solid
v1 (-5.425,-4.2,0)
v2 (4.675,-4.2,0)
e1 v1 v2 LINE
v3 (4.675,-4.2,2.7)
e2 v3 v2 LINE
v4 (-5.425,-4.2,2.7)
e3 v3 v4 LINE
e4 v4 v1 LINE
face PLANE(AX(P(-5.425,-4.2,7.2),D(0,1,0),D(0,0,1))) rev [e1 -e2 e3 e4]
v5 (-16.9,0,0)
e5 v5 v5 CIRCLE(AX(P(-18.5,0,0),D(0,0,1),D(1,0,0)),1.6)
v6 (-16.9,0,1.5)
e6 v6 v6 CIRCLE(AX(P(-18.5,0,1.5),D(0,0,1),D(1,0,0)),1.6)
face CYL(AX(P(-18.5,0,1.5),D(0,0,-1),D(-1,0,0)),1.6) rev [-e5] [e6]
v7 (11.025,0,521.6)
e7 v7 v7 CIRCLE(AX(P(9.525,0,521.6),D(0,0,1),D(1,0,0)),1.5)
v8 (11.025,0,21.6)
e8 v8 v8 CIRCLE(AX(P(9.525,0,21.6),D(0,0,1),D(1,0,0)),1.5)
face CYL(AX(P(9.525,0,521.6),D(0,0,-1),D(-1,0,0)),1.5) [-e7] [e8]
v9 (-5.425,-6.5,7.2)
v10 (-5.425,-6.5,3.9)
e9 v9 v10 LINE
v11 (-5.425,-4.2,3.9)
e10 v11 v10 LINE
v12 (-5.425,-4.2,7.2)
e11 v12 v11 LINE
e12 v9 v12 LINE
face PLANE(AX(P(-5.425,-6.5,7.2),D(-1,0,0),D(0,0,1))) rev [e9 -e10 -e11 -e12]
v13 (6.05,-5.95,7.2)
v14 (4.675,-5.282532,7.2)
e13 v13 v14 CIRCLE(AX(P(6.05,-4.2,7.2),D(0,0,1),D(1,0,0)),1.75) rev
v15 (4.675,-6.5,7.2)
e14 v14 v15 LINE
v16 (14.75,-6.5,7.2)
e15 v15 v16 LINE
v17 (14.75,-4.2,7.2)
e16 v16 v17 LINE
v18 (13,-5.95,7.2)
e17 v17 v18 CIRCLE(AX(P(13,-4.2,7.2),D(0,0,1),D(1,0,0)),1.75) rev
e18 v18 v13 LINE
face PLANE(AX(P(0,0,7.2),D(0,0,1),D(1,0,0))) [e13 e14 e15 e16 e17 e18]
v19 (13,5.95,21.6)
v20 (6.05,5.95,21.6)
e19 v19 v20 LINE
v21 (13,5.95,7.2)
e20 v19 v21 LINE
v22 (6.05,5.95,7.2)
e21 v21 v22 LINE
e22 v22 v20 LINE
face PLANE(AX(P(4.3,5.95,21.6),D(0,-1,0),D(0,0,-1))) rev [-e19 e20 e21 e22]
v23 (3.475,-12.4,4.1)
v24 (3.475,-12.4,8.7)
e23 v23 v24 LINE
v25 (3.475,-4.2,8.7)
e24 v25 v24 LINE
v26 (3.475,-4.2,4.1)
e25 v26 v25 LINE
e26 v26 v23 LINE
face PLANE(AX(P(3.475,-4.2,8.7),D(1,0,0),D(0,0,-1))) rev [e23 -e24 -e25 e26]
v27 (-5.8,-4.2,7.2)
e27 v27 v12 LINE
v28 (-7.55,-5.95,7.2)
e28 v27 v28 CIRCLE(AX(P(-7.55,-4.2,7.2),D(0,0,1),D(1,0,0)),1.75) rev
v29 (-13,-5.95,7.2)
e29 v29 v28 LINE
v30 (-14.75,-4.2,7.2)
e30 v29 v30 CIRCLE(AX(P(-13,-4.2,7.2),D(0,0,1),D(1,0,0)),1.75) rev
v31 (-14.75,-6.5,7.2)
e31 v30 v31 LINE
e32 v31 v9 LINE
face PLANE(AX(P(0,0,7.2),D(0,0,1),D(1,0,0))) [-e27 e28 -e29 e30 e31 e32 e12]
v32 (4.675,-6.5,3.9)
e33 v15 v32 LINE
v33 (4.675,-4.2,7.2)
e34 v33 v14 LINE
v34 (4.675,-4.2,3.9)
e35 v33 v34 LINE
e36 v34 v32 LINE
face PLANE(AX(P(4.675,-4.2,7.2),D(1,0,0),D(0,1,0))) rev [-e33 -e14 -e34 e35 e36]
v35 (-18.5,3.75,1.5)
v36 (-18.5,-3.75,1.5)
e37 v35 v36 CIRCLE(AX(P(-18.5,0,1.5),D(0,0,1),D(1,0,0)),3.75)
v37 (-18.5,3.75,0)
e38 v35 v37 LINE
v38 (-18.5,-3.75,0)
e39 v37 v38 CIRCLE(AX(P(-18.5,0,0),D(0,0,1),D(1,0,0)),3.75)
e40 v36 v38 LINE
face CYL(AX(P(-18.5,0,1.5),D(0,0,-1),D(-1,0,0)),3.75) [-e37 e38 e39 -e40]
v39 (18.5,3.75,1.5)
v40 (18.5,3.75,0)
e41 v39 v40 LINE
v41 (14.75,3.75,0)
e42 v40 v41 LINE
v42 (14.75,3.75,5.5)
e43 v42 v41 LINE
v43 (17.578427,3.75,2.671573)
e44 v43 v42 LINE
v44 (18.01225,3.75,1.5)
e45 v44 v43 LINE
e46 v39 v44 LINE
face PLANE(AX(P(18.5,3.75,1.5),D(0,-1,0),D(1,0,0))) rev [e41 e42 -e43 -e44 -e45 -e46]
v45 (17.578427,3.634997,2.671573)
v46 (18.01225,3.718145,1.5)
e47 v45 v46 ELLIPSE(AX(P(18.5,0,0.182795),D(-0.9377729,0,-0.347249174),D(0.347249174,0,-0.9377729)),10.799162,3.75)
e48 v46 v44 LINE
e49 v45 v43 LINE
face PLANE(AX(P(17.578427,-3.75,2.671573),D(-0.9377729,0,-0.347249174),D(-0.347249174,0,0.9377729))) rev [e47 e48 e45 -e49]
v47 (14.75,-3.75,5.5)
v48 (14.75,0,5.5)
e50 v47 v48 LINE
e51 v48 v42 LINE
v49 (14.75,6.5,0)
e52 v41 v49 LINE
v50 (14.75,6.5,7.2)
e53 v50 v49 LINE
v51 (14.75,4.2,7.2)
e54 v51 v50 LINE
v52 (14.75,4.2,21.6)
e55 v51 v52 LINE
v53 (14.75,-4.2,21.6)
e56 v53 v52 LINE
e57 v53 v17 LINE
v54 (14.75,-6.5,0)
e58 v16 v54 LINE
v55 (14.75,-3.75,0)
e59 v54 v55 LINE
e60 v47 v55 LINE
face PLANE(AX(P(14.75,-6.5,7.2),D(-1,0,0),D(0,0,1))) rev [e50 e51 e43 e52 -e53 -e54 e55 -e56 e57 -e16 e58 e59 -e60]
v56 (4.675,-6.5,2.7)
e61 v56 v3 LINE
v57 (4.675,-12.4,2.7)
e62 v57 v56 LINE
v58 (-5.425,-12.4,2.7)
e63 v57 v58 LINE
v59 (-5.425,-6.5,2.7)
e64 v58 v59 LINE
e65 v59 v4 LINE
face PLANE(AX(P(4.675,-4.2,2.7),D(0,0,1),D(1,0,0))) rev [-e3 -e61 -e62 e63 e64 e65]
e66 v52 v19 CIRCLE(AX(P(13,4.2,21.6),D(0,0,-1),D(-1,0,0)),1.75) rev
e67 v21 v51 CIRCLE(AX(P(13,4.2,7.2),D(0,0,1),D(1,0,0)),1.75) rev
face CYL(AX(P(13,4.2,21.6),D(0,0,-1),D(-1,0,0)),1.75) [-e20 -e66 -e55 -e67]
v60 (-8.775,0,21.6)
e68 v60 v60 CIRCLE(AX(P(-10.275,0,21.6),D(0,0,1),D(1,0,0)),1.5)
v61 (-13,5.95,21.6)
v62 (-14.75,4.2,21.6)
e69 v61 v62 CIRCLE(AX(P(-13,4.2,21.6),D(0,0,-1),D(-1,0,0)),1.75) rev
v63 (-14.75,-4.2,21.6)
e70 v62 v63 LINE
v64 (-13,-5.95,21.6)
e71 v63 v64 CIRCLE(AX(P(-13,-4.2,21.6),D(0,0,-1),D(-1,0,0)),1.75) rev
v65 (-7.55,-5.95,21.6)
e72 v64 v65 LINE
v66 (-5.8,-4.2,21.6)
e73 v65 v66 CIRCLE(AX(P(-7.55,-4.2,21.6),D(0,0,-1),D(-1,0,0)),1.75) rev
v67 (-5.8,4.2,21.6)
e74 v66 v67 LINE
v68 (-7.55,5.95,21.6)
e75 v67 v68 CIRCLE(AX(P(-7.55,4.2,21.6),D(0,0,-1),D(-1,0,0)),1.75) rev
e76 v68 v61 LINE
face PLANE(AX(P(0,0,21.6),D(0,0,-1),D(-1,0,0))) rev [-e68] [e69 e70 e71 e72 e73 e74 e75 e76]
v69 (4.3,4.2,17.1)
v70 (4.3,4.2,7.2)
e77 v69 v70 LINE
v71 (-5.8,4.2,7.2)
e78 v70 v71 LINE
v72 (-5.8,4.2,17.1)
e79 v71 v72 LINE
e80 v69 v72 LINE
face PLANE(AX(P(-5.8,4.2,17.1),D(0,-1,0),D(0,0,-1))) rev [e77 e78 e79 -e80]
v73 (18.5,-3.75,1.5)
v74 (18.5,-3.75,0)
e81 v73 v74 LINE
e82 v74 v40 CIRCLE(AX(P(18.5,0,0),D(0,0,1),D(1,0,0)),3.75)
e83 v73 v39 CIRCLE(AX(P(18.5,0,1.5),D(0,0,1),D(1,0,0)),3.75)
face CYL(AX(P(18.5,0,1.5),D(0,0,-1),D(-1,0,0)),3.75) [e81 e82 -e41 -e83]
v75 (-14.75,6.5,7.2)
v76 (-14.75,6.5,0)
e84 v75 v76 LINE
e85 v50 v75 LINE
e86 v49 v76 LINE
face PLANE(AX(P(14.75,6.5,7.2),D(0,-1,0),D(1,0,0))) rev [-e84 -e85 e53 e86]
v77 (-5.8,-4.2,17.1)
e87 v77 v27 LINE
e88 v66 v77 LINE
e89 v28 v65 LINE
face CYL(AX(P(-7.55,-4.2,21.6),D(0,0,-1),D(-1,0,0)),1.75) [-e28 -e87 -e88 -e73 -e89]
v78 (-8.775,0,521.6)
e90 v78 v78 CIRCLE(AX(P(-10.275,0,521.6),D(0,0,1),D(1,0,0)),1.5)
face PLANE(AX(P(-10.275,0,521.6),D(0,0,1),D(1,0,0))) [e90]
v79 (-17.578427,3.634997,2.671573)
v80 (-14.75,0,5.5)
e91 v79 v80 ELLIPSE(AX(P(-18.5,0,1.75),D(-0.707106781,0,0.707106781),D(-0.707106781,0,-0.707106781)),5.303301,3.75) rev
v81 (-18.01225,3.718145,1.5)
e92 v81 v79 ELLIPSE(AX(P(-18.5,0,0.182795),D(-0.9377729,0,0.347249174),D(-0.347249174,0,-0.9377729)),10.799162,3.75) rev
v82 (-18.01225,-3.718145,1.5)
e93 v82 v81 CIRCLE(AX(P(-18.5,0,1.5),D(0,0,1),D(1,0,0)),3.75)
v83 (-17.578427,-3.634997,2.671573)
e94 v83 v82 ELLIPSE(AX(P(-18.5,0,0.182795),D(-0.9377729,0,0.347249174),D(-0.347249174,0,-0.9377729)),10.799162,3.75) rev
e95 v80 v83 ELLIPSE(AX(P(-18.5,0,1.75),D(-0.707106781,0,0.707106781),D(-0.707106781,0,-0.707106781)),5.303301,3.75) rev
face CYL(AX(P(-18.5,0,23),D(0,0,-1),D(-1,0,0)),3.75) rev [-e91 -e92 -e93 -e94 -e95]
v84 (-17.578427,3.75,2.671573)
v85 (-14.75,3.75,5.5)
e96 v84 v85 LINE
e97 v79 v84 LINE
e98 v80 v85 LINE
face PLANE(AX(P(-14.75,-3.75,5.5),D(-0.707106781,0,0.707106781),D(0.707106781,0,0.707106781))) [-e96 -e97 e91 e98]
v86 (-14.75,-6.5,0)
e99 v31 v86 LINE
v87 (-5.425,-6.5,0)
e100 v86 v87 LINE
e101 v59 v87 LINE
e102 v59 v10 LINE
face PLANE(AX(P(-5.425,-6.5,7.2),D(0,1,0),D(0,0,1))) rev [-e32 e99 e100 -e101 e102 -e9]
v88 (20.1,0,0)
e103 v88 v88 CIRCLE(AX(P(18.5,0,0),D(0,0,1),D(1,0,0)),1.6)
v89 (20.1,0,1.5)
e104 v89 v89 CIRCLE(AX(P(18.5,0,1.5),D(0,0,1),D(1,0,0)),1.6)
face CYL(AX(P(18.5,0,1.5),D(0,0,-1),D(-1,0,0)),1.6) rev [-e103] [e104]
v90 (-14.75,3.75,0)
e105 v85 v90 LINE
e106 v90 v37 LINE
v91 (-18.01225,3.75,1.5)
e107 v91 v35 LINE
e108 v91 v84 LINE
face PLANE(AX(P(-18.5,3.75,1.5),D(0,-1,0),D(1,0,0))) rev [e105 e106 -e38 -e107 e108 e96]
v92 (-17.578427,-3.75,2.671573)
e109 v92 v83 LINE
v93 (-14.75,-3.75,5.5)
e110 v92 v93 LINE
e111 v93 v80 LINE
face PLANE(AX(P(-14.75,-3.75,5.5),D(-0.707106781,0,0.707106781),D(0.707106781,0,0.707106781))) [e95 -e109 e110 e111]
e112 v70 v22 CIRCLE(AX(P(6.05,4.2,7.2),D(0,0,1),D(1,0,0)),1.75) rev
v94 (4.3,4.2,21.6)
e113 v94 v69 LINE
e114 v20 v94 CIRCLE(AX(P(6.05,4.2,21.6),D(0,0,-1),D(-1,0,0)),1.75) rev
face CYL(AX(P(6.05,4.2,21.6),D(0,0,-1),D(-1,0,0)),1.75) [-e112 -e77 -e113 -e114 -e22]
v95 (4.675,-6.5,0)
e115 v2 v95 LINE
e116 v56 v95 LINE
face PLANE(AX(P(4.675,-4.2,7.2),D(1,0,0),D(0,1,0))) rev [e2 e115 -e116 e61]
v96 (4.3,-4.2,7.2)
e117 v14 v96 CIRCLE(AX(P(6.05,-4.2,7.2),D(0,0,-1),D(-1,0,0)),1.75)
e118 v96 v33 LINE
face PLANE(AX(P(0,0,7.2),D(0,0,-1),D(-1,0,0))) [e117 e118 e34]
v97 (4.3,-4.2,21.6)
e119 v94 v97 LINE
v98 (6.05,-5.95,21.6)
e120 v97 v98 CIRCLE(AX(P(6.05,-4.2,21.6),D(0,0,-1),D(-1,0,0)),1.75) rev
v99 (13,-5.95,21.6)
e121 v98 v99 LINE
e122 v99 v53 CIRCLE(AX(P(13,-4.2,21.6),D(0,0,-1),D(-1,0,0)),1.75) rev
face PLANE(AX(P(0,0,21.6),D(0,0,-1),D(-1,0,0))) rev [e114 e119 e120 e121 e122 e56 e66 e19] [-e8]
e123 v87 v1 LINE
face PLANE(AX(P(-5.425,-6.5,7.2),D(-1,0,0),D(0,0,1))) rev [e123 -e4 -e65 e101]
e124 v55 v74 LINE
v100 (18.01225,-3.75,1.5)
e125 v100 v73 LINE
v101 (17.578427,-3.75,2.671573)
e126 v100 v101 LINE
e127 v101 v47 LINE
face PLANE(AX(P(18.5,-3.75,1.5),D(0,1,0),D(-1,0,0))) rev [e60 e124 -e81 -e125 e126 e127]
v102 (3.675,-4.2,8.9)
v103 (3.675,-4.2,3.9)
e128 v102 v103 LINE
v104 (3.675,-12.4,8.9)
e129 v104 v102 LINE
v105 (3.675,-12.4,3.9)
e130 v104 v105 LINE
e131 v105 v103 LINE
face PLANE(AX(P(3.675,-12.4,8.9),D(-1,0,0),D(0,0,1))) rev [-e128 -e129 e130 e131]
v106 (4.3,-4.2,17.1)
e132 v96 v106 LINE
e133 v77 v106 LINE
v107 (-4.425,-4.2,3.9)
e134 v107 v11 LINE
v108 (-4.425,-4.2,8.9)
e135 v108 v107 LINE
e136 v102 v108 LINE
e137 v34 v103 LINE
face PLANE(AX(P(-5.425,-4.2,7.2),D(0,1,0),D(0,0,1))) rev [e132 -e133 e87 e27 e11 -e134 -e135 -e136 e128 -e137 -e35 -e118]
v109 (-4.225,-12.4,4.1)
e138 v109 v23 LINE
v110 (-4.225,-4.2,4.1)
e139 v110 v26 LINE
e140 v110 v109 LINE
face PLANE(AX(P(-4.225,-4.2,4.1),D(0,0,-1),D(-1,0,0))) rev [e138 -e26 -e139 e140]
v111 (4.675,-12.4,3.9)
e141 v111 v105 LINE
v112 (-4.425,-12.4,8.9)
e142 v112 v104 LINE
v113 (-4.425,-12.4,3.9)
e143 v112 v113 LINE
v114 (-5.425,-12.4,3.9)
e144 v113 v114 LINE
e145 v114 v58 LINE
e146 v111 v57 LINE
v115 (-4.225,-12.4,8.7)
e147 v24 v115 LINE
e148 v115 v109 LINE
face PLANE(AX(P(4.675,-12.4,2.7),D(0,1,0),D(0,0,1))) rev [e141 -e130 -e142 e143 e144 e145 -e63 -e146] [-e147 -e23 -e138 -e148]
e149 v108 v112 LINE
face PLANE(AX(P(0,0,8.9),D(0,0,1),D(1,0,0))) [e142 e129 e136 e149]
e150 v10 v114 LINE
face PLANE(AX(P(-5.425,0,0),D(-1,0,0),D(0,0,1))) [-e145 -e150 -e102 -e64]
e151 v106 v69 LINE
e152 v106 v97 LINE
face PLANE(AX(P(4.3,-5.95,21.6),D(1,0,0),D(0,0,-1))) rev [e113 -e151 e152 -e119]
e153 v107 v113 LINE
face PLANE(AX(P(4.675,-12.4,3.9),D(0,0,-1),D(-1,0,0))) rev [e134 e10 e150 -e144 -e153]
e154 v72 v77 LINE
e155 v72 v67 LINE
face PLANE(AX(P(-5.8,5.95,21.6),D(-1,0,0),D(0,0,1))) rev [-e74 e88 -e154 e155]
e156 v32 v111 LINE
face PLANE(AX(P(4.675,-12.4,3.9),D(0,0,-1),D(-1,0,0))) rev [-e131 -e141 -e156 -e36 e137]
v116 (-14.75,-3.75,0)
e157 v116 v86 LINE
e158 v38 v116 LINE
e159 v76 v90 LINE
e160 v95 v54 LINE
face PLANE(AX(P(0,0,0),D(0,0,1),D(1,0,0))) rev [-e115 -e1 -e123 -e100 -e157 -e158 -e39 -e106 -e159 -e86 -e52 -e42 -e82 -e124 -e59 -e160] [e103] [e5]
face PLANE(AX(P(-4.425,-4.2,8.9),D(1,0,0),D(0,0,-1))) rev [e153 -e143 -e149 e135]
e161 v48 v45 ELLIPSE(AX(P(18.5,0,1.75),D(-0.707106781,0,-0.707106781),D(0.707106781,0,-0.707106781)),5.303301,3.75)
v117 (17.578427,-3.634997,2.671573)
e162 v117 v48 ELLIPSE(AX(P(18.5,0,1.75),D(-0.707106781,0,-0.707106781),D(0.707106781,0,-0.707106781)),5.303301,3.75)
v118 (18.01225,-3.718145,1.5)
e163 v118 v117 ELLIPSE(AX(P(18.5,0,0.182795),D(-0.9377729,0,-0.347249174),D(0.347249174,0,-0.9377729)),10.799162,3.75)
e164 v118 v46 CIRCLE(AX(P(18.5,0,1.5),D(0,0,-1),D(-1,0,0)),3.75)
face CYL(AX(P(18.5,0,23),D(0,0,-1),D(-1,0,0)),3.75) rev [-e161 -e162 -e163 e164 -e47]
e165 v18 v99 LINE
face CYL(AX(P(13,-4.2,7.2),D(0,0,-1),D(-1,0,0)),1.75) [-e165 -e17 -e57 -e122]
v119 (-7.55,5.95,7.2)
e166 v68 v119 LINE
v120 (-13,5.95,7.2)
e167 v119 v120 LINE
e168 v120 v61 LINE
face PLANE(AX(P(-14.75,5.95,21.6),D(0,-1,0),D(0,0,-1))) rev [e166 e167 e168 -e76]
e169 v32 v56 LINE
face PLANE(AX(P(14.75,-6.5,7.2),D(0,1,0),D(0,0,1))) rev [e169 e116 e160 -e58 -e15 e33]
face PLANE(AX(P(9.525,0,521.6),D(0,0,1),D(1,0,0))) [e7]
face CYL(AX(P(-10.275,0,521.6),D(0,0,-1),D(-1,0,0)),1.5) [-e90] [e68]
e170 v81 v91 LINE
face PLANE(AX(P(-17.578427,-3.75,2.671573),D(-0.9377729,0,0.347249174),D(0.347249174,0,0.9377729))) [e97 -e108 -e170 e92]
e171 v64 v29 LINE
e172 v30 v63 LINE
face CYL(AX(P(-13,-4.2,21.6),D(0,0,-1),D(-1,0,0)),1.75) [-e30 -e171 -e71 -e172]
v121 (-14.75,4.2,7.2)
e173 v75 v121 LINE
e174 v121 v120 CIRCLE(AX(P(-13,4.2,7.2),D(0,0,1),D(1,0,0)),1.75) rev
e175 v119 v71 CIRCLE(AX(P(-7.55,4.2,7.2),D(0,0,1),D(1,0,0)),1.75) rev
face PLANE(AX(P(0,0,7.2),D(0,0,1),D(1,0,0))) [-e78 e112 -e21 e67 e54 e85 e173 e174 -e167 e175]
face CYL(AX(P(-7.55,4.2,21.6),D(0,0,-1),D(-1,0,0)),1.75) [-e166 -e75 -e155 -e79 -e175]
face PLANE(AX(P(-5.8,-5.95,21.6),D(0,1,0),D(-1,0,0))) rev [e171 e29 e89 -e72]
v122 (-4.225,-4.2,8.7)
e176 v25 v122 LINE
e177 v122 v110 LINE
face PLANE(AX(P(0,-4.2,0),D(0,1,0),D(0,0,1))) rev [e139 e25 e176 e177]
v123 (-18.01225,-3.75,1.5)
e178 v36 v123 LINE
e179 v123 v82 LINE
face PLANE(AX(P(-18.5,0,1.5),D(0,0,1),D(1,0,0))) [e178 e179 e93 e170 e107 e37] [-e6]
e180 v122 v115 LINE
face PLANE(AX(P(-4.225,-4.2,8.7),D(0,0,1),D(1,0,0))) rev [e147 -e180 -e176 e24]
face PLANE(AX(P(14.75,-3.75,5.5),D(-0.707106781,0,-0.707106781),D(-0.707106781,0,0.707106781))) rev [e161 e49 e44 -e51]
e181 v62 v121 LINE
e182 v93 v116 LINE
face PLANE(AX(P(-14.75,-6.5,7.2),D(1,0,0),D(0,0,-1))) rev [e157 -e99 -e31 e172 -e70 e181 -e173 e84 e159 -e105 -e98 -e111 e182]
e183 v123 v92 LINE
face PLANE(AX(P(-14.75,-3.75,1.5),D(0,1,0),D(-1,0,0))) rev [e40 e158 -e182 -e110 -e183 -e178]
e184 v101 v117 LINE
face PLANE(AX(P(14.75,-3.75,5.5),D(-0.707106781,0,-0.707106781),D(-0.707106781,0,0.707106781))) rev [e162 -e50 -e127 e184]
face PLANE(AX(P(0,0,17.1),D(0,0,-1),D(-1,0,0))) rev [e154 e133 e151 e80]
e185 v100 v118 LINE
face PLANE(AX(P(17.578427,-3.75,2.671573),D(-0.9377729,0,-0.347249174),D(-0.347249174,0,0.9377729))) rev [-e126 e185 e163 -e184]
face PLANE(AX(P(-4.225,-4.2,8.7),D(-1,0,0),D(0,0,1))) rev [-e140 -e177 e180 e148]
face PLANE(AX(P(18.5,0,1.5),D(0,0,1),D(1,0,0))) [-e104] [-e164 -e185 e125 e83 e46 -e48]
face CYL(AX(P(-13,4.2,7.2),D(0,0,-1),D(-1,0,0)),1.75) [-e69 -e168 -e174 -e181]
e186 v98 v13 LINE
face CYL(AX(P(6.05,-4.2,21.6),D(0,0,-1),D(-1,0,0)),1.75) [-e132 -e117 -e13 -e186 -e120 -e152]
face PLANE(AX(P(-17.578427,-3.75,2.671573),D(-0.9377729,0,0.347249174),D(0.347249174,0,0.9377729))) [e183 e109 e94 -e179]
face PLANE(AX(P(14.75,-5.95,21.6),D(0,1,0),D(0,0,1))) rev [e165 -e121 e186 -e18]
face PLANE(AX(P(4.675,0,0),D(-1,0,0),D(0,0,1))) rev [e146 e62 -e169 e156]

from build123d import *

# Parameters (mm, degrees)
EXTRUDE_1_DEPTH     = 7.2
SKETCH_2_R          = 1.6
EXTRUDE_2_DEPTH     = 1.5
EXTRUDE_START       = -7.5
EXTRUDE_3_DEPTH     = 7.5
EXTRUDE_4_DEPTH     = 10.1
SKETCH_7_R          = 3.75
CUT_EXTRUDE_3_DEPTH = 21.5
SKETCH_8_W          = 10.45
SKETCH_8_H          = 11.9
EXTRUDE_5_DEPTH     = 14.4
FILLET_1_R          = 1.75
EXTRUDE_6_DEPTH     = 9.9
SKETCH_10_W         = 8.1
SKETCH_10_H         = 8.2
EXTRUDE_7_DEPTH     = 5
SKETCH_11_W         = 7.7
SKETCH_11_H         = 4.6
CUT_EXTRUDE_4_DEPTH = 8.2
SKETCH_13_R         = 1.5
EXTRUDE_9_DEPTH     = 500


with BuildPart() as part:
    # 草图1 → 凸台-拉伸1 (new body)
    with BuildSketch(Plane.XY):
        Polygon((14.75, -6.5), (4.675, -6.5), (4.675, -4.2), (-5.425, -4.2), (-5.425, -6.5), (-14.75, -6.5), (-14.75, 6.5), (14.75, 6.5), align=None)
    extrude(amount=EXTRUDE_1_DEPTH)

    # 草图2 → 凸台-拉伸2 (add)
    # profile 1 of 2: a face of its own
    with BuildSketch(Plane.XY):
        with BuildLine():
            Line((-18.5, 3.75), (-14.75, 3.75))
            Line((-14.75, 3.75), (-14.75, -3.75))
            Line((-14.75, -3.75), (-18.5, -3.75))
            ThreePointArc((-18.5, -3.75), (-22.25, 0), (-18.5, 3.75))
        make_face()
        with Locations((-18.5, 0)):
            Circle(SKETCH_2_R, mode=Mode.SUBTRACT)
    # profile 2 of 2: a face of its own
    with BuildSketch(Plane.XY):
        with BuildLine():
            Line((18.5, 3.75), (14.75, 3.75))
            Line((14.75, 3.75), (14.75, 0))
            Line((14.75, 0), (14.75, -3.75))
            Line((14.75, -3.75), (18.5, -3.75))
            ThreePointArc((18.5, -3.75), (22.25, 0), (18.5, 3.75))
        make_face()
        with Locations((18.5, 0)):
            Circle(SKETCH_2_R, mode=Mode.SUBTRACT)
    extrude(amount=EXTRUDE_2_DEPTH)

    # 草图3 → 凸台-拉伸3 (add)
    with BuildSketch(Plane(origin=(0, 3.75, 0), x_dir=(1, 0, 0), z_dir=(0, 1, 0)).offset(EXTRUDE_START)):
        Polygon((-14.75, -1.5), (-14.75, -5.5), (-17.578427125, -2.671572875), (-18.012250402, -1.5), align=None)
    extrude_3 = extrude(amount=EXTRUDE_3_DEPTH)

    # 草图5 → 凸台-拉伸4 (add)
    with BuildSketch(Plane(origin=(-5.425, 0, 0), x_dir=(0, 0, -1), z_dir=(1, 0, 0))):
        Polygon((-3.9, -4.2), (-2.7, -4.2), (-2.7, -6.5), (-2.7, -12.4), (-3.9, -12.4), align=None)
    extrude(amount=EXTRUDE_4_DEPTH)

    # 草图7 → 切除-拉伸3 (cut)
    with BuildSketch(Plane.XY.offset(1.5)):
        with Locations((-18.5, 0)):
            Circle(SKETCH_7_R)
        with BuildLine():
            Line((-18.012250402, 1.523843932), (-18.012250402, -1.523843932))
            ThreePointArc((-18.012250402, -1.523843932), (-20.1, 0), (-18.012250402, 1.523843932))
        make_face(mode=Mode.SUBTRACT)
    cut_extrude_3 = extrude(amount=CUT_EXTRUDE_3_DEPTH, mode=Mode.SUBTRACT)

    # 镜向2: 凸台-拉伸3, 切除-拉伸3 across plane
    add(extrude_3.mirror(Plane(origin=(0, 0, 0), x_dir=(0, 0, 1), z_dir=(1, 0, 0))))
    add(cut_extrude_3.mirror(Plane(origin=(0, 0, 0), x_dir=(0, 0, 1), z_dir=(1, 0, 0))), mode=Mode.SUBTRACT)

    # 草图8 → 凸台-拉伸5 (add)
    with BuildSketch(Plane.XY.offset(7.2)):
        Polygon((-14.75, 0), (-14.75, 5.95), (-5.8, 5.95), (-5.8, -5.95), (-14.75, -5.95), align=None)
        with Locations((9.525, 0)):
            Rectangle(SKETCH_8_W, SKETCH_8_H)
    extrude(amount=EXTRUDE_5_DEPTH)

    # 圆角1
    # the kernel refuses this fillet: 1.75 mm, written as the material it takes off along each edge
    with BuildSketch(Plane(origin=(-14.75, -5.95, 7.2), x_dir=(0, 1, 0), z_dir=(0, 0, 1)), Plane(origin=(14.75, 5.95, 7.2), x_dir=(0, -1, 0), z_dir=(0, 0, 1))) as fillet_1_piece_1:
        with BuildLine():
            CenterArc((FILLET_1_R, -FILLET_1_R), FILLET_1_R, 90, 90)
            Line((0, -FILLET_1_R), (0, 0))
            Line((0, 0), (FILLET_1_R, 0))
        make_face()
    extrude(amount=18.775, mode=Mode.SUBTRACT)
    with BuildSketch(Plane(origin=(-5.8, -5.95, 7.2), x_dir=(0, 1, 0), z_dir=(0, 0, 1)), Plane(origin=(-5.8, 5.95, 7.2), x_dir=(-1, 0, 0), z_dir=(0, 0, 1)), Plane(origin=(-14.75, 5.95, 7.2), x_dir=(0, -1, 0), z_dir=(0, 0, 1)), Plane(origin=(14.75, -5.95, 7.2), x_dir=(0, 1, 0), z_dir=(0, 0, 1)), Plane(origin=(4.3, 5.95, 7.2), x_dir=(0, -1, 0), z_dir=(0, 0, 1)), Plane(origin=(4.3, -5.95, 7.2), x_dir=(1, 0, 0), z_dir=(0, 0, 1))) as fillet_1_piece_2:
        with BuildLine():
            CenterArc((FILLET_1_R, FILLET_1_R), FILLET_1_R, 180, 90)
            Line((0, FILLET_1_R), (0, 0))
            Line((0, 0), (FILLET_1_R, 0))
        make_face()
    extrude(amount=18.775, mode=Mode.SUBTRACT)

    # 草图9 → 凸台-拉伸6 (add)
    with BuildSketch(Plane.XY.offset(7.2)):
        Polygon((-5.8, 0), (-5.8, 4.2), (4.3, 4.2), (4.3, -4.2), (-5.8, -4.2), align=None)
    extrude(amount=EXTRUDE_6_DEPTH)

    # 草图10 → 凸台-拉伸7 (add)
    with BuildSketch(Plane.XY.offset(3.9)):
        with Locations((-0.375, -8.3)):
            Rectangle(SKETCH_10_W, SKETCH_10_H)
    extrude(amount=EXTRUDE_7_DEPTH)

    # 草图11 → 切除-拉伸4 (cut)
    with BuildSketch(Plane.XZ.offset(12.4)):
        with Locations((-0.375, 6.4)):
            Rectangle(SKETCH_11_W, SKETCH_11_H)
    extrude(amount=-CUT_EXTRUDE_4_DEPTH, mode=Mode.SUBTRACT)

    # 草图13 → 凸台-拉伸9 (add)
    with BuildSketch(Plane.XY.offset(21.6)):
        with Locations((-10.275, 0)):
            Circle(SKETCH_13_R)
        with Locations((9.525, 0)):
            Circle(SKETCH_13_R)
    extrude(amount=EXTRUDE_9_DEPTH)


solid = part.part
